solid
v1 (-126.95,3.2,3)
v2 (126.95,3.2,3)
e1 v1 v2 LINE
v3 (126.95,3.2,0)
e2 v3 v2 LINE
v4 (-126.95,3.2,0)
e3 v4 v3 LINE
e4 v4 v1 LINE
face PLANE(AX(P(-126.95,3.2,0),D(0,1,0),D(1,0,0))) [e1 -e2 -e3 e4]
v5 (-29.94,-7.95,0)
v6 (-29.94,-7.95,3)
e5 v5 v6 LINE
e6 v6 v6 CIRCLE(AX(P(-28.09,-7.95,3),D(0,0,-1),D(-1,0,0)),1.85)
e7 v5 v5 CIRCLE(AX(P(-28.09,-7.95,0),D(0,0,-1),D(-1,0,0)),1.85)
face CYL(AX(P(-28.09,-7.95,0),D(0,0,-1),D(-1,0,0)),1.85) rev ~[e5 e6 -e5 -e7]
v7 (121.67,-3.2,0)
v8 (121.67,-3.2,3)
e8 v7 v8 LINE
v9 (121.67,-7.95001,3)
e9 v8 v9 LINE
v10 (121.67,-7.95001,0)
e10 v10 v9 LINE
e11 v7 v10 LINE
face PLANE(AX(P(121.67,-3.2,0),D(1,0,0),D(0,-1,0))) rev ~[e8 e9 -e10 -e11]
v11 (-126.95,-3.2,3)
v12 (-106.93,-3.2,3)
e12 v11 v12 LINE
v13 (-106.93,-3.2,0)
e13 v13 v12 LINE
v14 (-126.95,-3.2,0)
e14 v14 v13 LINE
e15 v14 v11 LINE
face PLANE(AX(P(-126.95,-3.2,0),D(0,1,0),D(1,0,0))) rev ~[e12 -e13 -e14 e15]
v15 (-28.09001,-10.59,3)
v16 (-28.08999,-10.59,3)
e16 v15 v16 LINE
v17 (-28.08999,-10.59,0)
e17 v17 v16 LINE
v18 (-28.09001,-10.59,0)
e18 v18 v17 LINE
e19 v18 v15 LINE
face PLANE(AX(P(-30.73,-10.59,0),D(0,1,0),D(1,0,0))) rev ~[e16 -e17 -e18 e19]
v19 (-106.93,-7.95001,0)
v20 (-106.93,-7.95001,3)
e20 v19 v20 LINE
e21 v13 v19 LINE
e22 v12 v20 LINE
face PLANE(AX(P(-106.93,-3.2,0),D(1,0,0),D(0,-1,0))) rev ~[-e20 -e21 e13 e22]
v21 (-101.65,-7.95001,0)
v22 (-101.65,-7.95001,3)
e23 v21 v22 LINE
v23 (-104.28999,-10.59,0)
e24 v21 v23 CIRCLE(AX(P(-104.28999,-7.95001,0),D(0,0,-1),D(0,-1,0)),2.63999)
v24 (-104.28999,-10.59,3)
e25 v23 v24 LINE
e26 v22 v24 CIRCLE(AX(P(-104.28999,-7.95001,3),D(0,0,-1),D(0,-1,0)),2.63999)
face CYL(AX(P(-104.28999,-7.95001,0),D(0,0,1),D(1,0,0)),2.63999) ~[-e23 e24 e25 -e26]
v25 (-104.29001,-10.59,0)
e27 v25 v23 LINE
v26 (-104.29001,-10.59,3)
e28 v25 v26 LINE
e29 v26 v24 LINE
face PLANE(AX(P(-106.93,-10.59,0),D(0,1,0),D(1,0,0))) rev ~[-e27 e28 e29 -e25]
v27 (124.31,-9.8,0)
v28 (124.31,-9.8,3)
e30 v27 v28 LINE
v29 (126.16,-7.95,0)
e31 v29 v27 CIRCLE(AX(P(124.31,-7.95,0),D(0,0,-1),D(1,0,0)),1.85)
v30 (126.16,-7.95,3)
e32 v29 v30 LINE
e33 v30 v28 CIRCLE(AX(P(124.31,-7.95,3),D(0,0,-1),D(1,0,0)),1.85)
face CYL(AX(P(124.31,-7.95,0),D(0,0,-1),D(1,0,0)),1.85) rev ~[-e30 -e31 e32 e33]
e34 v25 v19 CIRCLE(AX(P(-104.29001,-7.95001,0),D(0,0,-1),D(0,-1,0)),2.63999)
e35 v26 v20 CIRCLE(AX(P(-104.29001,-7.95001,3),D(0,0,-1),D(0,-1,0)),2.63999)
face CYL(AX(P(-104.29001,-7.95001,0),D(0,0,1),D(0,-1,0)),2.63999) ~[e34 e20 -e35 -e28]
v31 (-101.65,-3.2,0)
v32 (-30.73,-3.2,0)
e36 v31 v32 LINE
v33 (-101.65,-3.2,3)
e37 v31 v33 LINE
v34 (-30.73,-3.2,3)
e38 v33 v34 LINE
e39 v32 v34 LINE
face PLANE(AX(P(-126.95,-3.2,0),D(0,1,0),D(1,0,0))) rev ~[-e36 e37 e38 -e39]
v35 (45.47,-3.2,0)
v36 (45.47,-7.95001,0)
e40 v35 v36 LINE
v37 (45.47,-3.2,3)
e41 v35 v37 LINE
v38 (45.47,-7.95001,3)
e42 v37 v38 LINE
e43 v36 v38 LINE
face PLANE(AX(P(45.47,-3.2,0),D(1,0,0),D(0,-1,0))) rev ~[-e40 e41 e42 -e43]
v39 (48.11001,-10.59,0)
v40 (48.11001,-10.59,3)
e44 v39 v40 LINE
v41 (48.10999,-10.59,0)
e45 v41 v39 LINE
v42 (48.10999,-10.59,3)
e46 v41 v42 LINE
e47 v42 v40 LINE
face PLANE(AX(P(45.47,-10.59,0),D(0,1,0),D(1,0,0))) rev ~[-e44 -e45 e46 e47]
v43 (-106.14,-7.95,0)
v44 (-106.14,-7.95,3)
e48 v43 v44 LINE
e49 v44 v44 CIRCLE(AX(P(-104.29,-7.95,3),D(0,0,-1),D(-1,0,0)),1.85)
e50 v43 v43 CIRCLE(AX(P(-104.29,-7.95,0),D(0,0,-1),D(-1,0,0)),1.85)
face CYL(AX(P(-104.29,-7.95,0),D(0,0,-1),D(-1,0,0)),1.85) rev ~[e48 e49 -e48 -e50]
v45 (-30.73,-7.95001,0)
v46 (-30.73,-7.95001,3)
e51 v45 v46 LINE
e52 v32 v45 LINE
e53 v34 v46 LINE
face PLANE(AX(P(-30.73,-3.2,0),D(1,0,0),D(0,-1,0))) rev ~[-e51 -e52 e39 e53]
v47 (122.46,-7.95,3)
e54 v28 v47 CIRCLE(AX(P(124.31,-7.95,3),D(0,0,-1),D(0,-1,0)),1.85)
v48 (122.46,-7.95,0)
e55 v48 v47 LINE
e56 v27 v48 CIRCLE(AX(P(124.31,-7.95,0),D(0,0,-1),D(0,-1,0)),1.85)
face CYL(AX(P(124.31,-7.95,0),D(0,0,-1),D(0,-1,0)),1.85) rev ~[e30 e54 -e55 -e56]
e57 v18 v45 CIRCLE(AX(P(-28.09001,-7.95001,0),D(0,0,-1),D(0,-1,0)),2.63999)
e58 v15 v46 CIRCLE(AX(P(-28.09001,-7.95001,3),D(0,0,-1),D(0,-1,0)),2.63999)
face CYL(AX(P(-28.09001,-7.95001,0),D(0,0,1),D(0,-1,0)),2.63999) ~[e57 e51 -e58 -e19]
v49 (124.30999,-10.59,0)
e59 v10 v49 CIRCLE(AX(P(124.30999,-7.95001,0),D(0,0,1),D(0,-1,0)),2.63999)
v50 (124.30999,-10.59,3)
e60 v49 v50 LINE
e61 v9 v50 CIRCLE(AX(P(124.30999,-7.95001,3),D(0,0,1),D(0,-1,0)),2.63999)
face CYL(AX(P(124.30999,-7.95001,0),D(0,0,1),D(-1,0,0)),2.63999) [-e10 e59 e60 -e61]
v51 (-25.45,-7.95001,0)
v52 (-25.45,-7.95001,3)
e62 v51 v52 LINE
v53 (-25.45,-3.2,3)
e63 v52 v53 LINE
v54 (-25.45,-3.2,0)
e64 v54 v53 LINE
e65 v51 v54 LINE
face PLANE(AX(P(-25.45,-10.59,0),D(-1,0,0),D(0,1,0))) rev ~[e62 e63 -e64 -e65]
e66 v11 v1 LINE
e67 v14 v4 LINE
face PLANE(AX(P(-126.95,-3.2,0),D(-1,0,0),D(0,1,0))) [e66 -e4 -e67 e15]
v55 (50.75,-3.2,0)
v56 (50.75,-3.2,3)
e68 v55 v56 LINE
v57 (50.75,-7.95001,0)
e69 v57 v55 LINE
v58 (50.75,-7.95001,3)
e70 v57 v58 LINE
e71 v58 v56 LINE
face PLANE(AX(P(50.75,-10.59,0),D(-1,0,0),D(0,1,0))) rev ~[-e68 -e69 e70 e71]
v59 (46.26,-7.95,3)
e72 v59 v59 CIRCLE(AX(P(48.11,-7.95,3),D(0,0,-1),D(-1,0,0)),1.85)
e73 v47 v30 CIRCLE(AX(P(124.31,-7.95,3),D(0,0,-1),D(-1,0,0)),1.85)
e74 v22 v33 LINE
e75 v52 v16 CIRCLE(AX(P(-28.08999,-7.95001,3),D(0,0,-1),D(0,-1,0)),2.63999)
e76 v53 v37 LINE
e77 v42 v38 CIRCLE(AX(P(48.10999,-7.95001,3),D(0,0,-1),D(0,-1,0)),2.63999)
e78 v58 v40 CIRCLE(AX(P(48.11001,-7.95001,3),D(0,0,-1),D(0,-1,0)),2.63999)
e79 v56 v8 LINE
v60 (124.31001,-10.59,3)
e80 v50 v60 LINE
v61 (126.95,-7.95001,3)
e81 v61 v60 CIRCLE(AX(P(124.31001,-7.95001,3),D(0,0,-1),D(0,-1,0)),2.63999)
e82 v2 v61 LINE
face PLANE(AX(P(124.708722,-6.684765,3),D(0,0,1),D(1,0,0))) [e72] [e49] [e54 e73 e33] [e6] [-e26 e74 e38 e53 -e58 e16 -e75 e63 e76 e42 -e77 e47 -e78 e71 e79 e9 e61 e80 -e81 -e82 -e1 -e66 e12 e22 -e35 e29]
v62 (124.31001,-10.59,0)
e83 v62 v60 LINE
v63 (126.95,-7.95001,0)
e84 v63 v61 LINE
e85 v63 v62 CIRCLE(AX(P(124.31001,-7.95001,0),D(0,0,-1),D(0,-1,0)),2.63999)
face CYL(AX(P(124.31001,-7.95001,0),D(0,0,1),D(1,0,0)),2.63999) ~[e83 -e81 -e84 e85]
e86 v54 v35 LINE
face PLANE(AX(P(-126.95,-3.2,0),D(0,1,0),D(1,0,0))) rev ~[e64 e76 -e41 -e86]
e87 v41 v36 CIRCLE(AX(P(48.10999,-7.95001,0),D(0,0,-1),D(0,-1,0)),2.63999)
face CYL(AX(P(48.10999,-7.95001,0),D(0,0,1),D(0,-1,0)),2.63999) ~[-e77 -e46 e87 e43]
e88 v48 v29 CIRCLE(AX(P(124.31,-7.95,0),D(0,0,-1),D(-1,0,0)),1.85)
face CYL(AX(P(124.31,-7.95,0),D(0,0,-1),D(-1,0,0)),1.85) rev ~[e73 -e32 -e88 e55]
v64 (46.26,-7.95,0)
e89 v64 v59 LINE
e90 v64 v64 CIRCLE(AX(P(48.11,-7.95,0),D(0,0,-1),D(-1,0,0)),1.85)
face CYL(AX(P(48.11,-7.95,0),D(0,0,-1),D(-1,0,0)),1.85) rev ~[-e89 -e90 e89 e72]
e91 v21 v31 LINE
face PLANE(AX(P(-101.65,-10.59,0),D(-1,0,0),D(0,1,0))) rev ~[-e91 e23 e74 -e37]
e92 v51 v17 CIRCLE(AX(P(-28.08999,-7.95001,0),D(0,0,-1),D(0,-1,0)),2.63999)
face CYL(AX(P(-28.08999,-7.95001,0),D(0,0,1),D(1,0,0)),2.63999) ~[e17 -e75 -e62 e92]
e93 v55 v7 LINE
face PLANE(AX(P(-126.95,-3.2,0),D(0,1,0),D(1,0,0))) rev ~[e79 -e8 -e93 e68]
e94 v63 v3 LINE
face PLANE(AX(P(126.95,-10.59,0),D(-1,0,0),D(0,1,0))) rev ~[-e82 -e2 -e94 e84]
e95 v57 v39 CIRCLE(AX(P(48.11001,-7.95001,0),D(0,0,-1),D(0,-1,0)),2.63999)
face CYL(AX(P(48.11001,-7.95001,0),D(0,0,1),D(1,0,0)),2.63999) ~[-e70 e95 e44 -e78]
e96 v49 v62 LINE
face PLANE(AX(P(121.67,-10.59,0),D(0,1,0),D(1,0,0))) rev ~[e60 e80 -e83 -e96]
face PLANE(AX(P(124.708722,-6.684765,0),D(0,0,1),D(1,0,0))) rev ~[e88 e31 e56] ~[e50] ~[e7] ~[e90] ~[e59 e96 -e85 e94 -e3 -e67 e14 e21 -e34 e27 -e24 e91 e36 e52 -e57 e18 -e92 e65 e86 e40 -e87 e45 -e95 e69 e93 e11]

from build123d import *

# Parameters (mm, degrees)
F0_W     = 253.9
F0_H     = 6.4
F1_DEPTH = 3
F3_DEPTH = 3
F4_R     = 2.63999


# Not quite as in the source:
# - a fillet or chamfer is up to 0.001 mm smaller than in the source, because OpenCascade refuses the exact size


with BuildPart() as f1:
    # F0 (on Top) → F1 (new body)
    with BuildSketch(Plane.XY):
        Rectangle(F0_W, F0_H)
    extrude(amount=F1_DEPTH)

    # F2 (on Top) → F3 (join)
    with BuildSketch(Plane.XY):
        with BuildLine():
            Line((126.95, -10.59), (126.95, -3.2))
            Line((126.95, -3.2), (121.67, -3.2))
            Line((121.67, -3.2), (121.67, -7.95))
            Line((121.67, -7.95), (122.46, -7.95))
            ThreePointArc((122.46, -7.95), (124.31, -6.1), (126.16, -7.95))
            ThreePointArc((126.16, -7.95), (125.6181475452, -9.2581475452), (124.31, -9.8))
            Line((124.31, -9.8), (124.31, -10.59))
            Line((124.31, -10.59), (126.95, -10.59))
        make_face()
        with BuildLine():
            Line((122.46, -7.95), (121.67, -7.95))
            Line((121.67, -7.95), (121.67, -10.59))
            Line((121.67, -10.59), (124.31, -10.59))
            Line((124.31, -10.59), (124.31, -9.8))
            ThreePointArc((124.31, -9.8), (123.0018524548, -9.2581475452), (122.46, -7.95))
        make_face()
        Polygon((50.75, -10.59), (50.75, -3.2), (45.47, -3.2), (45.47, -7.95), (45.47, -10.59), align=None)
        with BuildLine():
            ThreePointArc((49.96, -7.95), (48.11, -9.8), (46.26, -7.95))
            ThreePointArc((46.26, -7.95), (48.11, -6.1), (49.96, -7.95))
        make_face(mode=Mode.SUBTRACT)
        Polygon((-101.65, -3.2), (-106.93, -3.2), (-106.93, -7.95), (-106.93, -10.59), (-101.65, -10.59), align=None)
        with BuildLine():
            ThreePointArc((-102.44, -7.95), (-104.29, -9.8), (-106.14, -7.95))
            ThreePointArc((-106.14, -7.95), (-104.29, -6.1), (-102.44, -7.95))
        make_face(mode=Mode.SUBTRACT)
        Polygon((-25.45, -3.2), (-30.73, -3.2), (-30.73, -7.95), (-30.73, -10.59), (-25.45, -10.59), align=None)
        with BuildLine():
            ThreePointArc((-26.24, -7.95), (-28.09, -9.8), (-29.94, -7.95))
            ThreePointArc((-29.94, -7.95), (-28.09, -6.1), (-26.24, -7.95))
        make_face(mode=Mode.SUBTRACT)
    extrude(amount=F3_DEPTH)

    # F4 (radius 2.64 in the source; OpenCascade refuses exactly that, so slightly less here)
    f4_edges = [f1.edges().sort_by_distance(p)[0] for p in [
        (45.47, -10.59, 1.5),
        (50.75, -10.59, 1.5),
        (121.67, -10.59, 1.5),
        (126.95, -10.59, 1.5),
        (-30.73, -10.59, 1.5),
        (-25.45, -10.59, 1.5),
        (-106.93, -10.59, 1.5),
        (-101.65, -10.59, 1.5),
    ]]
    fillet(f4_edges, radius=F4_R)


solid = f1.part
